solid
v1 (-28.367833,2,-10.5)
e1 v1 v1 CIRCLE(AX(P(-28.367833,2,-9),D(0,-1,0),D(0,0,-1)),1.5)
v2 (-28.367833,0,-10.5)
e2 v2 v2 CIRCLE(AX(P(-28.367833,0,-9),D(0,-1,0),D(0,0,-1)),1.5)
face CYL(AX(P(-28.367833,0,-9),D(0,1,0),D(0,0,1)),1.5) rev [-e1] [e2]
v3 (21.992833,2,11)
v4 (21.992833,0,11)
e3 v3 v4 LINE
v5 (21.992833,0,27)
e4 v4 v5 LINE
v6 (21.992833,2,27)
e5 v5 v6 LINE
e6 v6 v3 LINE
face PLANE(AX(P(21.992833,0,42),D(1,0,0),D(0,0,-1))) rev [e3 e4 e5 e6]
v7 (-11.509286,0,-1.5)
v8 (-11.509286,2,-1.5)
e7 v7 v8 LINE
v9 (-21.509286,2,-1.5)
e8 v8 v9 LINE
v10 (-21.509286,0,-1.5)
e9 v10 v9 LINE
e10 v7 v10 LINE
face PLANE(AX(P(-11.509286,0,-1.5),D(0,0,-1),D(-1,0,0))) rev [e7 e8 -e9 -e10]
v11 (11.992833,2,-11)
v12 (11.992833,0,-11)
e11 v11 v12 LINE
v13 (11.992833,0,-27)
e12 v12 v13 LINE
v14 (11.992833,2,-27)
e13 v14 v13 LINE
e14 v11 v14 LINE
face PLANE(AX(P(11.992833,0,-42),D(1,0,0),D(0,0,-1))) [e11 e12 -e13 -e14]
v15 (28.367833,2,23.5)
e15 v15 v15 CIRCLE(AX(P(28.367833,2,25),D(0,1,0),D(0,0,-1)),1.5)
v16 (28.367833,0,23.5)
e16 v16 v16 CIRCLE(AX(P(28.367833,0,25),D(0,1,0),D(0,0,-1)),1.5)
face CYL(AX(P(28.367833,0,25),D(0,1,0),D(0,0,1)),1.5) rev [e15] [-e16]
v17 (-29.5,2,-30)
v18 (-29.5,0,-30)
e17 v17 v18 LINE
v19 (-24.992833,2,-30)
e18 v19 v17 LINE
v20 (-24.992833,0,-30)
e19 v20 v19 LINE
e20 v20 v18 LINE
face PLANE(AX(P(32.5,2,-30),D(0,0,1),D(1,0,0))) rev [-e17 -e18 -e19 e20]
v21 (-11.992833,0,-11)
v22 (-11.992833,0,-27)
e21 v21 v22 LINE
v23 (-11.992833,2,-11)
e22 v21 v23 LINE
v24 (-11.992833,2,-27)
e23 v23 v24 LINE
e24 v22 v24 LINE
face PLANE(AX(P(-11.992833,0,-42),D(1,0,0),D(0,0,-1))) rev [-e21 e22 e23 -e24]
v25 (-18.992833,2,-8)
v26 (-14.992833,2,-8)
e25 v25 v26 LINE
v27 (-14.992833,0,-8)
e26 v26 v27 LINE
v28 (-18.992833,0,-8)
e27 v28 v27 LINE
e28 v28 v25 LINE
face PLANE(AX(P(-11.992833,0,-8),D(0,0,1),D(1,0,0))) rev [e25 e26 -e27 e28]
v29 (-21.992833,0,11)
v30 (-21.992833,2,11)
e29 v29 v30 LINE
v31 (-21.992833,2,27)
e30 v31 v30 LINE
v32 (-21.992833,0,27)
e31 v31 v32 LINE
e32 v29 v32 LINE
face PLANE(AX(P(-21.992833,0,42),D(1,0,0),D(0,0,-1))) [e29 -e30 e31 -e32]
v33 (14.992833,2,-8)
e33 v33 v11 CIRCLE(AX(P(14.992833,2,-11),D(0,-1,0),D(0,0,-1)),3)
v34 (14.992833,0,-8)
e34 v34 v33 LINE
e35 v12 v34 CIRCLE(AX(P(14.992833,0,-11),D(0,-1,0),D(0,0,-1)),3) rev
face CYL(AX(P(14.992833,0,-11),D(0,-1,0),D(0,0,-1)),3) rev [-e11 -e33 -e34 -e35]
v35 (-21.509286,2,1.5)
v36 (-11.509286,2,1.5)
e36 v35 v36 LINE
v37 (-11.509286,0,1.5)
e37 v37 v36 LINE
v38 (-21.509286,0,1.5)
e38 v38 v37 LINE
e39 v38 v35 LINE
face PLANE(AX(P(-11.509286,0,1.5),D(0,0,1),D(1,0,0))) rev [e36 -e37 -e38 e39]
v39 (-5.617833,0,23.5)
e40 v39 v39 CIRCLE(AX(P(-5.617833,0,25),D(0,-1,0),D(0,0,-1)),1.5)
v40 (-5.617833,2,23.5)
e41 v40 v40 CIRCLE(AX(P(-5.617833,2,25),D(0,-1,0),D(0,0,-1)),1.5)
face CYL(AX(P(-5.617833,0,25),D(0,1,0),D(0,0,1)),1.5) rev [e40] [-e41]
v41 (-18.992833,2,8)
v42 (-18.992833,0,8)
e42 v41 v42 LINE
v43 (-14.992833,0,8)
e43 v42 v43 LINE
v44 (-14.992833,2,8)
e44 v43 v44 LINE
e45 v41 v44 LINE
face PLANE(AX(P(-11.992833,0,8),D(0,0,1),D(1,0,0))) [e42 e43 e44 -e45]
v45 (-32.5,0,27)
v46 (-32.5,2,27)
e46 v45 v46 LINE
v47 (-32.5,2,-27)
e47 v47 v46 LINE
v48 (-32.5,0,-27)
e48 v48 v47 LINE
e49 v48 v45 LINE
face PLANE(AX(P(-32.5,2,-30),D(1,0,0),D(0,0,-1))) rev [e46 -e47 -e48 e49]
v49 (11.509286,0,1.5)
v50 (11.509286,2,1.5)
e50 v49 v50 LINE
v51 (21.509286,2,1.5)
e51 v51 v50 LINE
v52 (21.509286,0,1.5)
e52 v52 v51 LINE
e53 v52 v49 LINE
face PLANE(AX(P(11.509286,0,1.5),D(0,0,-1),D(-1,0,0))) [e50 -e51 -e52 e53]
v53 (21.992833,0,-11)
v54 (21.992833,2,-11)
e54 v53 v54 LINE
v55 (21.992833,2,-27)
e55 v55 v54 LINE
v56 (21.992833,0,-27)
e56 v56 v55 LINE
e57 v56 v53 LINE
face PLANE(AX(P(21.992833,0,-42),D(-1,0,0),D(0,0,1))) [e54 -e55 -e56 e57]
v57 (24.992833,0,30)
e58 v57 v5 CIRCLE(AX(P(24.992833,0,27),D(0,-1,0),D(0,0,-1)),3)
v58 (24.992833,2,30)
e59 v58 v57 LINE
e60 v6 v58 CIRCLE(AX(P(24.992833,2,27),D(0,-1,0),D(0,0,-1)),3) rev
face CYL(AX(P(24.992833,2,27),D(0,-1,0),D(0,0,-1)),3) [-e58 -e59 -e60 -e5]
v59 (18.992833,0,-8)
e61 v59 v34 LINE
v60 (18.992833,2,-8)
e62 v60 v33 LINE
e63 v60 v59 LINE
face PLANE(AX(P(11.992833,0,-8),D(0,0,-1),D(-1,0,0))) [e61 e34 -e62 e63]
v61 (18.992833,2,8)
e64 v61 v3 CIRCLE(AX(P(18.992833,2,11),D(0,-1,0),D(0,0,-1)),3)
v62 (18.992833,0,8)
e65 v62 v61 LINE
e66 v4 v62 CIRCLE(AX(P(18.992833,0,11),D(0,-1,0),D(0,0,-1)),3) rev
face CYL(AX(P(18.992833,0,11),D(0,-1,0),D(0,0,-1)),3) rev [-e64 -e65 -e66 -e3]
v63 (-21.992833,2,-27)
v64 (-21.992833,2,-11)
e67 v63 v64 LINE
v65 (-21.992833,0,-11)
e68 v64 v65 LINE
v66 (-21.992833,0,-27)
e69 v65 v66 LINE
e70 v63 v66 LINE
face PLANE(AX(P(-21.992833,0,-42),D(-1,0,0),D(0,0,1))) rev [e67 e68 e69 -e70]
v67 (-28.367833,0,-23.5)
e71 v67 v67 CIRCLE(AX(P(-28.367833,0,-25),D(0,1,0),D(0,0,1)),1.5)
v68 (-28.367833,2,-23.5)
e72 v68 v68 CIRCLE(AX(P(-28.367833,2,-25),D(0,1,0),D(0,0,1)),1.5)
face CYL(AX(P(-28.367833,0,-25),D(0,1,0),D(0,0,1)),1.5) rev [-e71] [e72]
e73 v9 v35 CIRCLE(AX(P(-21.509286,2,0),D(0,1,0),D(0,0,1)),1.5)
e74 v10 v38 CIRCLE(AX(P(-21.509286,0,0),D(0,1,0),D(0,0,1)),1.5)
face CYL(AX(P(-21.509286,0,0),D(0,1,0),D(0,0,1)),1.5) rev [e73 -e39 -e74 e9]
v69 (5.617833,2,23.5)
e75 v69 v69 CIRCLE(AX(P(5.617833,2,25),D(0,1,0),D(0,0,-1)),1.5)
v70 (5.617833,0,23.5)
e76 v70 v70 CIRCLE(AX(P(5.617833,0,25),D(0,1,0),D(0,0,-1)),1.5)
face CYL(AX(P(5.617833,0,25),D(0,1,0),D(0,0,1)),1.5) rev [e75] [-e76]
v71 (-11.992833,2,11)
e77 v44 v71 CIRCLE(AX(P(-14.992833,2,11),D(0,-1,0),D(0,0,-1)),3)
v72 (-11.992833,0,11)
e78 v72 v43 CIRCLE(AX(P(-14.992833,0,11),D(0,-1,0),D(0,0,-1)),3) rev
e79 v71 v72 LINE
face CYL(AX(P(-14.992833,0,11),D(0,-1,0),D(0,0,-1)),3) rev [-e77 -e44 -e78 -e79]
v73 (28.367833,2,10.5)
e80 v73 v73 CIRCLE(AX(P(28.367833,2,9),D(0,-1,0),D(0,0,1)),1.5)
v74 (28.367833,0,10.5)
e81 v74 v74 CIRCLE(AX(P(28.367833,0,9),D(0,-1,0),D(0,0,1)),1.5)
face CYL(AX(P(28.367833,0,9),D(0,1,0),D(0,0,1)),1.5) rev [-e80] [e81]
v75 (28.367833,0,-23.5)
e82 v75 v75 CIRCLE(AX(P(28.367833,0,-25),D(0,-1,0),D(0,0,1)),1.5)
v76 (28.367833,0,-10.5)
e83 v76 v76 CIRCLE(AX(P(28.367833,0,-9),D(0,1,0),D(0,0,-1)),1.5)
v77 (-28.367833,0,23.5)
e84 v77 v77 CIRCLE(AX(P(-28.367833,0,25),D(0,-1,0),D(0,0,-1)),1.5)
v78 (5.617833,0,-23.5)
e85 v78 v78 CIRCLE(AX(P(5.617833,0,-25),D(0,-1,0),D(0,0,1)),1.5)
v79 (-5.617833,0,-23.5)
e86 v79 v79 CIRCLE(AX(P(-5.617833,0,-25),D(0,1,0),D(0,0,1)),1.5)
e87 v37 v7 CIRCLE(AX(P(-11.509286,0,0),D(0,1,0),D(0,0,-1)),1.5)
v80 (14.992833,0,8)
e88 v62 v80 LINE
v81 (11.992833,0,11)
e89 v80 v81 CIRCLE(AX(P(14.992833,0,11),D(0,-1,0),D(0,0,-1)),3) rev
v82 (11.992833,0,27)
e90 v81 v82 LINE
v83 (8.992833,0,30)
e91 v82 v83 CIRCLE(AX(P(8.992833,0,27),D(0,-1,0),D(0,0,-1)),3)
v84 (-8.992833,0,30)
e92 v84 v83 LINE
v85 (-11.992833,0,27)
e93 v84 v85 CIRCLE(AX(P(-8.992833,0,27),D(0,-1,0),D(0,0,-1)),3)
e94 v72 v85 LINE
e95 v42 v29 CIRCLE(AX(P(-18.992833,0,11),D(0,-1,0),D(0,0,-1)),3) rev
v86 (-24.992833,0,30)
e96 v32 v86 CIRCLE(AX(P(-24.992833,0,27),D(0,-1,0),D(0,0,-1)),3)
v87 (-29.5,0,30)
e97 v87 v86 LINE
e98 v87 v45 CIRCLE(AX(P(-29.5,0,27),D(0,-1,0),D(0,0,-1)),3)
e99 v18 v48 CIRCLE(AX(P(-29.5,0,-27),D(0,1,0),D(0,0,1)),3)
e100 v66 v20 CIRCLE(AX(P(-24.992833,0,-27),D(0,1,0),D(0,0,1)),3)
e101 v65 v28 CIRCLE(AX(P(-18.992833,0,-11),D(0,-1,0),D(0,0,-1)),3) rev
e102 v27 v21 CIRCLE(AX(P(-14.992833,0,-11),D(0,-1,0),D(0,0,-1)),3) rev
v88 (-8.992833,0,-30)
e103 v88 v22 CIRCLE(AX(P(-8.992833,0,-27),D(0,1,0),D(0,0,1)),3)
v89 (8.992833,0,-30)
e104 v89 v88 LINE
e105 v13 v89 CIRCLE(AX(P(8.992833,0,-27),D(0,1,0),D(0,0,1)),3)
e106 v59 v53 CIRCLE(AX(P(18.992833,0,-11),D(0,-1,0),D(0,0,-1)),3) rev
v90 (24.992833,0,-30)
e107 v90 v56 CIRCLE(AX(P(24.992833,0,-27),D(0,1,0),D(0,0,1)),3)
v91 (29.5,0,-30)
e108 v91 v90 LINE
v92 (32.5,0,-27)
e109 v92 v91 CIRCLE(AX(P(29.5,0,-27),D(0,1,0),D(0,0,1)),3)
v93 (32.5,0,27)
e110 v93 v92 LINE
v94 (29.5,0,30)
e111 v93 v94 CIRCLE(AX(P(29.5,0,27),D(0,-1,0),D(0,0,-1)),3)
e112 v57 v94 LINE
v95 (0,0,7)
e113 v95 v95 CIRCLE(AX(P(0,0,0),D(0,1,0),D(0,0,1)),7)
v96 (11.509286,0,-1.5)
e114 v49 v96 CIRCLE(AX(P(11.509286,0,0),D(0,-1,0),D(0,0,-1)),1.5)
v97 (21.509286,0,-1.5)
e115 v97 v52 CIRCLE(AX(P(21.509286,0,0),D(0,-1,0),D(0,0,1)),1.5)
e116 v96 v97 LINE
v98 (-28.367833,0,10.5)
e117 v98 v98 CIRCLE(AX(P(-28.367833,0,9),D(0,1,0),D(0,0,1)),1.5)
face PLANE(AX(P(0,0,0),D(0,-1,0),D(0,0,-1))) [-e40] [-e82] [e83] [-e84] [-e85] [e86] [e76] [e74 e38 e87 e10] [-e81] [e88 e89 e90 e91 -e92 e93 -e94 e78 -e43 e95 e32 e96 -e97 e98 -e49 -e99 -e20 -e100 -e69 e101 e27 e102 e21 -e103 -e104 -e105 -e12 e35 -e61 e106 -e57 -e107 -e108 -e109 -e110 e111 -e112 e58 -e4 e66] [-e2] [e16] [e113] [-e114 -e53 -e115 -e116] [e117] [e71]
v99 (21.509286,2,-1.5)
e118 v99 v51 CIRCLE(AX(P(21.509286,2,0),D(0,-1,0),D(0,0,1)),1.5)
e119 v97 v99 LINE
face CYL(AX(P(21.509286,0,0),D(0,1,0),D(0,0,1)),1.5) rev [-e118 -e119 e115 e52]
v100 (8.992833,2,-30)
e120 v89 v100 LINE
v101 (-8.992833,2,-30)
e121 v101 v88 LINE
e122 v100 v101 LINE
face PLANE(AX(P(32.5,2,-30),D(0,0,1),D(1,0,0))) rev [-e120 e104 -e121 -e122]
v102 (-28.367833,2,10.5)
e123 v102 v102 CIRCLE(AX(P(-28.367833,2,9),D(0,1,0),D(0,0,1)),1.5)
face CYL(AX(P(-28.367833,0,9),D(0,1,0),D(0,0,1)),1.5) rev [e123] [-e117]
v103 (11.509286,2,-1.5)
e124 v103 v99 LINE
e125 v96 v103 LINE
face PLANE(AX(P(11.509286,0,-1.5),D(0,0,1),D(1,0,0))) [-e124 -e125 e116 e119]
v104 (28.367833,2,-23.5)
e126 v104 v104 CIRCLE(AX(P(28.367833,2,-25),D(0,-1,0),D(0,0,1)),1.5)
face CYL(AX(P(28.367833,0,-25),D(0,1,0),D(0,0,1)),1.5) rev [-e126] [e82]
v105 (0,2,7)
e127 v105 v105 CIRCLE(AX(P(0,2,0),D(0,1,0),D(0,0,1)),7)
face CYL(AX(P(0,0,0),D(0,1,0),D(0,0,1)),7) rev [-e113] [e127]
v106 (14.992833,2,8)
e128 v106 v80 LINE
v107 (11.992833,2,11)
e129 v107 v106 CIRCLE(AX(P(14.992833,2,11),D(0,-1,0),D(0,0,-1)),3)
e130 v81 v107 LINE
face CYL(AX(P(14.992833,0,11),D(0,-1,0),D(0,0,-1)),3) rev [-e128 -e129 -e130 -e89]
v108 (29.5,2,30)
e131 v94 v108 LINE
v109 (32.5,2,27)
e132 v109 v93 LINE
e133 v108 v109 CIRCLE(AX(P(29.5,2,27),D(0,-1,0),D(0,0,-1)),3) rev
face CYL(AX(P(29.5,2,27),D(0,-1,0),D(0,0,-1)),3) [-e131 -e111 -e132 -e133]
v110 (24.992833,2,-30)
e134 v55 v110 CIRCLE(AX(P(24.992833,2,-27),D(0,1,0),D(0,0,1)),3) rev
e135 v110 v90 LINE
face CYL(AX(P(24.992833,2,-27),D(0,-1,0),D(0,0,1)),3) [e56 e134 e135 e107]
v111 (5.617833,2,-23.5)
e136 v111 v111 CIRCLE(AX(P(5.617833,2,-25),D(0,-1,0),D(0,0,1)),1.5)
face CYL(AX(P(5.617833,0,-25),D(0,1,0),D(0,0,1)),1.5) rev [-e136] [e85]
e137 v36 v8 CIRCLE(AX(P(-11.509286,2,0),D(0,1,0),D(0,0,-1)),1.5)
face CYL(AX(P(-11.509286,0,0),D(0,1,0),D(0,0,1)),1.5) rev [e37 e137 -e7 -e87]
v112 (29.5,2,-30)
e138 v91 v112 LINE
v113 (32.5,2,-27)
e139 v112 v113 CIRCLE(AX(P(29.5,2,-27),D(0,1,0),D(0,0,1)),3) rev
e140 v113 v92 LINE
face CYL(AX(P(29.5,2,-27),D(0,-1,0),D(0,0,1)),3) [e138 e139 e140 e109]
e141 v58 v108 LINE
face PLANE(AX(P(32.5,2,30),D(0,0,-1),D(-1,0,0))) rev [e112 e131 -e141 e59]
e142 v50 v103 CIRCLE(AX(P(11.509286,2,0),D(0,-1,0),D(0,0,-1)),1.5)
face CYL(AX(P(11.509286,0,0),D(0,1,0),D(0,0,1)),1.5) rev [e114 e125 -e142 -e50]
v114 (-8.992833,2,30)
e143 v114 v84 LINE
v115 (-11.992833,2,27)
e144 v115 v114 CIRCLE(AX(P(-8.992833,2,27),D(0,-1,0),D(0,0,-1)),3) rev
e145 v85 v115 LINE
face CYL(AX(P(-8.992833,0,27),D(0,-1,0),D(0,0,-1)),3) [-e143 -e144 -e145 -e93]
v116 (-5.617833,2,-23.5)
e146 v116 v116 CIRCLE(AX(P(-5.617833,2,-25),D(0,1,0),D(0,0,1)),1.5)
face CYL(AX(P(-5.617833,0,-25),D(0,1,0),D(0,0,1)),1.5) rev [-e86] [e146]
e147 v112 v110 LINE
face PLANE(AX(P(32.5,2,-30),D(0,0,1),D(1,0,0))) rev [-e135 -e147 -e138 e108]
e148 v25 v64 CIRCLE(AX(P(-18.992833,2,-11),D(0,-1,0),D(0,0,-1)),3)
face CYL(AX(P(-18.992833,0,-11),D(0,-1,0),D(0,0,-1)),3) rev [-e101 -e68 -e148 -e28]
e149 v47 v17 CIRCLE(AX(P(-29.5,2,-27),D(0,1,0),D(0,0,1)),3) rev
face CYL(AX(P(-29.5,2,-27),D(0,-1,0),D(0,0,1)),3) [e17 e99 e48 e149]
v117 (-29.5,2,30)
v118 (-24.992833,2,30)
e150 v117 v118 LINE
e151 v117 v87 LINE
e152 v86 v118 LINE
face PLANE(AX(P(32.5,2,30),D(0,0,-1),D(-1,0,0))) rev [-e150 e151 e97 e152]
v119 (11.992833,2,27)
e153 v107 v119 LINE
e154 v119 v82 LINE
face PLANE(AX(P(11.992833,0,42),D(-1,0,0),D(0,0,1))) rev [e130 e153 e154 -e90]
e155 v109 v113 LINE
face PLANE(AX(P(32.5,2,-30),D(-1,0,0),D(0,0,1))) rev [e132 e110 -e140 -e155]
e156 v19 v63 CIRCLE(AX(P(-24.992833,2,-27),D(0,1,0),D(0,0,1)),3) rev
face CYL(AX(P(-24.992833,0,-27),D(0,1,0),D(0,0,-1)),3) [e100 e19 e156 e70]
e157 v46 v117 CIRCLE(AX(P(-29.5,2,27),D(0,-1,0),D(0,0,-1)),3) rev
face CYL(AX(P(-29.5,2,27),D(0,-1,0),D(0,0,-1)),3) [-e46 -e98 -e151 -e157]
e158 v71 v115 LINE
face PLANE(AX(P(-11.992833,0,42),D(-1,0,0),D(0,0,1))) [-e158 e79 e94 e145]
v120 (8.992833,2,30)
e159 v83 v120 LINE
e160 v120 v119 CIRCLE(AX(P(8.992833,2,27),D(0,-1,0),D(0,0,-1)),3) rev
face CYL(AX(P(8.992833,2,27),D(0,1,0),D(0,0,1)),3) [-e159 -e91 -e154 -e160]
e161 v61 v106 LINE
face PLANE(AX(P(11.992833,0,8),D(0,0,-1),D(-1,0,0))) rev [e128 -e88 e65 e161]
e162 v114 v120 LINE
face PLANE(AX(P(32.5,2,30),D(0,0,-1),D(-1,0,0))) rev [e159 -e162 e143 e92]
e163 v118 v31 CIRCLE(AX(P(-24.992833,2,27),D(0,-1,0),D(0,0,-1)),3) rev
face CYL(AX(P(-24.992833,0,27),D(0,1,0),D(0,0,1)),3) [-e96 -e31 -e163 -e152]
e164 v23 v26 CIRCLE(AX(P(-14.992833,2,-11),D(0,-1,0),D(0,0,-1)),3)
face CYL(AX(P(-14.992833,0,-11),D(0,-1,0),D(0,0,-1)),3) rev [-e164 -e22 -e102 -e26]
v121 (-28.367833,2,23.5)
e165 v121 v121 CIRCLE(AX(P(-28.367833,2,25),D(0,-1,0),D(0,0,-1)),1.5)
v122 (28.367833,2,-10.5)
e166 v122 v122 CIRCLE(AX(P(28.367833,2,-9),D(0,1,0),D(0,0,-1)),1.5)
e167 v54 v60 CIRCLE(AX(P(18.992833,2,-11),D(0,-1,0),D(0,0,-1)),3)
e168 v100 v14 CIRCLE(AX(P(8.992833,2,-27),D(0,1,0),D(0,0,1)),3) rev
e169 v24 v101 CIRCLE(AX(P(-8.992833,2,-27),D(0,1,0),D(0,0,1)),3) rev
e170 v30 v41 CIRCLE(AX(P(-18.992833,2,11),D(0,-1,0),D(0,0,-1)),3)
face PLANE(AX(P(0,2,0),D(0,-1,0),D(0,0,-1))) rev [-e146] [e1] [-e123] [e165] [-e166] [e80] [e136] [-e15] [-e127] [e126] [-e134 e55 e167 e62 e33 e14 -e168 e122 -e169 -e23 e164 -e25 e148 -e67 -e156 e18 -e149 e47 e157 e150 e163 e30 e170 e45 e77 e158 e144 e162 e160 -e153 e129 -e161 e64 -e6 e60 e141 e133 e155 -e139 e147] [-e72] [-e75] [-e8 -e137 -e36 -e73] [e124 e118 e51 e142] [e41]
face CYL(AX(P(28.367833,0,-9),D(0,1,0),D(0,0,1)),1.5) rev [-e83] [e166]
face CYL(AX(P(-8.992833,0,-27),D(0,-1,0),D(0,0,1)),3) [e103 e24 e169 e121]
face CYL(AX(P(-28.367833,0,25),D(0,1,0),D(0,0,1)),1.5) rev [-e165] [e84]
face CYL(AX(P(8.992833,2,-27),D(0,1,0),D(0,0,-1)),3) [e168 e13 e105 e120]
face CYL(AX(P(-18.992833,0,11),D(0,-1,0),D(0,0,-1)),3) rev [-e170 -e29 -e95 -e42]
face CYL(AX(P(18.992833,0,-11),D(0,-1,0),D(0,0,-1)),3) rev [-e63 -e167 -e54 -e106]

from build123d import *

# Parameters (mm, degrees)
SKETCH_1_W               = 65
SKETCH_1_H               = 60
EXTRUDE_1_DEPTH          = 2
SKETCH_2_R               = 1.5
CUT_EXTRUDE_1_DEPTH      = 2
SKETCH_3_R               = 1.5
CUT_EXTRUDE_2_DEPTH      = 45.274710615
MIRROR_2_COPY_1_SKETCH_R = 1.5
MIRROR_2_COPY_1_DEPTH    = 2
MIRROR_2_COPY_2_SKETCH_R = 1.5
MIRROR_2_COPY_2_DEPTH    = 45.274710615
SKETCH_4_W               = 10
SKETCH_4_H               = 34
CUT_EXTRUDE_3_DEPTH      = 45.274710615
MIRROR_4_COPY_1_SKETCH_W = 10
MIRROR_4_COPY_1_SKETCH_H = 34
MIRROR_4_COPY_1_DEPTH    = 45.274710615
SKETCH_5_R               = 7
CUT_EXTRUDE_4_DEPTH      = 45.274710615
FILLET_1_R               = 3
MIRROR_6_DEPTH           = 2
SKETCH_6_R               = 1.5
CUT_EXTRUDE_5_DEPTH      = 45.274710615
CUT_EXTRUDE_6_DEPTH      = 45.274710615
MIRROR_8_COPY_1_SKETCH_R = 1.5
MIRROR_8_COPY_1_DEPTH    = 45.274710615
FILLET_2_R               = 3


# Read off the part's stored shape, not the designer's step: 镜向6
with BuildPart() as part:
    # 草图1 → 凸台-拉伸1 (new body)
    with BuildSketch(Plane(origin=(0, 0, 0), x_dir=(1, 0, 0), z_dir=(0, 1, 0))):
        Rectangle(SKETCH_1_W, SKETCH_1_H)
    extrude(amount=EXTRUDE_1_DEPTH)

    # 草图2 → 切除-拉伸1 (cut)
    with BuildSketch(Plane(origin=(0, 2, 0), x_dir=(1, 0, 0), z_dir=(0, 1, 0))):
        with Locations(Location((-28.367832783, 25, 0), (0, 0, 270))):
            Circle(SKETCH_2_R)
    cut_extrude_1 = extrude(amount=-CUT_EXTRUDE_1_DEPTH, mode=Mode.SUBTRACT)

    # 草图3 → 切除-拉伸2 (cut, through all)
    with BuildSketch(Plane(origin=(0, 2, 0), x_dir=(1, 0, 0), z_dir=(0, 1, 0))):
        with Locations(Location((-5.617832783, 25, 0), (0, 0, 270))):
            Circle(SKETCH_3_R)
    cut_extrude_2 = extrude(amount=-CUT_EXTRUDE_2_DEPTH, mode=Mode.SUBTRACT)

    # 镜向1: 切除-拉伸1, 切除-拉伸2 across plane
    add(cut_extrude_1.mirror(Plane(origin=(0, 0, 0), x_dir=(0, 0, 1), z_dir=(1, 0, 0))), mode=Mode.SUBTRACT)
    add(cut_extrude_2.mirror(Plane(origin=(0, 0, 0), x_dir=(0, 0, 1), z_dir=(1, 0, 0))), mode=Mode.SUBTRACT)

    # 镜向2: 切除-拉伸1, 切除-拉伸2 across plane
    add(cut_extrude_1.mirror(Plane.XY), mode=Mode.SUBTRACT)
    add(cut_extrude_2.mirror(Plane.XY), mode=Mode.SUBTRACT)

    # 镜向2 copy 1 sketch → 镜向2 copy 1 (cut)
    with BuildSketch(Plane(origin=(0, 2, 0), x_dir=(-1, 0, 0), z_dir=(0, 1, 0))):
        with Locations(Location((-28.367832783, 25, 0), (0, 0, 270))):
            Circle(MIRROR_2_COPY_1_SKETCH_R)
    extrude(amount=-MIRROR_2_COPY_1_DEPTH, mode=Mode.SUBTRACT)

    # 镜向2 copy 2 sketch → 镜向2 copy 2 (cut, through all)
    with BuildSketch(Plane(origin=(0, 2, 0), x_dir=(-1, 0, 0), z_dir=(0, 1, 0))):
        with Locations(Location((-5.617832783, 25, 0), (0, 0, 270))):
            Circle(MIRROR_2_COPY_2_SKETCH_R)
    extrude(amount=-MIRROR_2_COPY_2_DEPTH, mode=Mode.SUBTRACT)

    # 草图4 → 切除-拉伸3 (cut, through all)
    with BuildSketch(Plane(origin=(0, 2, 0), x_dir=(1, 0, 0), z_dir=(0, 1, 0))):
        with Locations((-16.992832783, 25)):
            Rectangle(SKETCH_4_W, SKETCH_4_H)
    cut_extrude_3 = extrude(amount=-CUT_EXTRUDE_3_DEPTH, mode=Mode.SUBTRACT)

    # 镜向3: 切除-拉伸3 across plane
    add(cut_extrude_3.mirror(Plane.XY), mode=Mode.SUBTRACT)

    # 镜向4: 切除-拉伸3 across plane
    add(cut_extrude_3.mirror(Plane(origin=(0, 0, 0), x_dir=(0, 0, 1), z_dir=(1, 0, 0))), mode=Mode.SUBTRACT)

    # 镜向4 copy 1 sketch → 镜向4 copy 1 (cut, through all)
    with BuildSketch(Plane(origin=(0, 2, 0), x_dir=(-1, 0, 0), z_dir=(0, 1, 0))):
        with Locations((-16.992832783, 25)):
            Rectangle(MIRROR_4_COPY_1_SKETCH_W, MIRROR_4_COPY_1_SKETCH_H)
    extrude(amount=-MIRROR_4_COPY_1_DEPTH, mode=Mode.SUBTRACT)

    # 草图5 → 切除-拉伸4 (cut, through all)
    with BuildSketch(Plane(origin=(0, 2, 0), x_dir=(1, 0, 0), z_dir=(0, 1, 0))):
        with Locations(Location((0, 0, 0), (0, 0, 270))):
            Circle(SKETCH_5_R)
    extrude(amount=-CUT_EXTRUDE_4_DEPTH, mode=Mode.SUBTRACT)

    # 圆角1
    fillet_1_edges = [part.edges().sort_by_distance(p)[0] for p in [
        (-21.992832783, 1, 30),
        (-11.992832783, 1, 30),
        (32.5, 1, 30),
        (-32.5, 1, 30),
        (21.992832783, 1, 30),
        (11.992832783, 1, 30),
    ]]
    fillet(fillet_1_edges, radius=FILLET_1_R)

    # 镜向6 outline → 镜向6 (cut)
    with BuildSketch(Plane(origin=(0, 0, 0), x_dir=(1, 0, 0), z_dir=(0, 1, 0))):
        with BuildLine():
            Line((-11.992832783, 30), (-11.992832783, 27))
            ThreePointArc((-11.992832783, 27), (-11.114153127, 29.121320343), (-8.992832783, 30))
            Line((-8.992832783, 30), (-11.992832783, 30))
        make_face()
        with BuildLine():
            Line((11.992832783, 30), (8.992832783, 30))
            ThreePointArc((8.992832783, 30), (11.114153127, 29.121320343), (11.992832783, 27))
            Line((11.992832783, 27), (11.992832783, 30))
        make_face()
        with BuildLine():
            Line((32.5, 30), (29.5, 30))
            ThreePointArc((29.5, 30), (31.621320344, 29.121320344), (32.5, 27))
            Line((32.5, 27), (32.5, 30))
        make_face()
        with BuildLine():
            ThreePointArc((21.992832783, 27), (22.871512439, 29.121320344), (24.992832783, 30))
            Line((24.992832783, 30), (21.992832783, 30))
            Line((21.992832783, 30), (21.992832783, 27))
        make_face()
        with BuildLine():
            ThreePointArc((-32.5, 27), (-31.621320344, 29.121320344), (-29.5, 30))
            Line((-29.5, 30), (-32.5, 30))
            Line((-32.5, 30), (-32.5, 27))
        make_face()
        with BuildLine():
            ThreePointArc((-24.992832783, 30), (-22.871512439, 29.121320344), (-21.992832783, 27))
            Line((-21.992832783, 27), (-21.992832783, 30))
            Line((-21.992832783, 30), (-24.992832783, 30))
        make_face()
    extrude(amount=MIRROR_6_DEPTH, mode=Mode.SUBTRACT)

    # 草图6 → 切除-拉伸5 (cut, through all)
    with BuildSketch(Plane(origin=(0, 2, 0), x_dir=(1, 0, 0), z_dir=(0, 1, 0))):
        with Locations(Location((-28.367832783, -9, 0), (0, 0, 270))):
            Circle(SKETCH_6_R)
    cut_extrude_5 = extrude(amount=-CUT_EXTRUDE_5_DEPTH, mode=Mode.SUBTRACT)

    # 镜向7: 切除-拉伸5 across plane
    add(cut_extrude_5.mirror(Plane.XY), mode=Mode.SUBTRACT)

    # 草图7 → 切除-拉伸6 (cut, through all)
    with BuildSketch(Plane(origin=(0, 2, 0), x_dir=(1, 0, 0), z_dir=(0, 1, 0))):
        with BuildLine():
            Line((-11.509285997, 1.5), (-21.509285997, 1.5))
            ThreePointArc((-21.509285997, 1.5), (-23.009285997, 0), (-21.509285997, -1.5))
            Line((-21.509285997, -1.5), (-11.509285997, -1.5))
            ThreePointArc((-11.509285997, -1.5), (-10.009285997, 0), (-11.509285997, 1.5))
        make_face()
    cut_extrude_6 = extrude(amount=-CUT_EXTRUDE_6_DEPTH, mode=Mode.SUBTRACT)

    # 镜向8: 切除-拉伸5, 切除-拉伸6 across plane
    add(cut_extrude_5.mirror(Plane(origin=(0, 0, 0), x_dir=(0, 0, 1), z_dir=(1, 0, 0))), mode=Mode.SUBTRACT)
    add(cut_extrude_6.mirror(Plane(origin=(0, 0, 0), x_dir=(0, 0, 1), z_dir=(1, 0, 0))), mode=Mode.SUBTRACT)

    # 镜向8 copy 1 sketch → 镜向8 copy 1 (cut, through all)
    with BuildSketch(Plane(origin=(0, 2, 0), x_dir=(-1, 0, 0), z_dir=(0, 1, 0))):
        with Locations(Location((-28.367832783, -9, 0), (0, 0, 270))):
            Circle(MIRROR_8_COPY_1_SKETCH_R)
    extrude(amount=-MIRROR_8_COPY_1_DEPTH, mode=Mode.SUBTRACT)

    # 圆角2
    fillet_2_edges = [part.edges().sort_by_distance(p)[0] for p in [
        (11.992832783, 1, -8),
        (21.992832783, 1, -8),
        (-21.992832783, 1, -8),
        (-11.992832783, 1, -8),
        (-11.992832783, 1, 8),
        (-21.992832783, 1, 8),
        (21.992832783, 1, 8),
        (11.992832783, 1, 8),
    ]]
    fillet(fillet_2_edges, radius=FILLET_2_R)


solid = part.part
